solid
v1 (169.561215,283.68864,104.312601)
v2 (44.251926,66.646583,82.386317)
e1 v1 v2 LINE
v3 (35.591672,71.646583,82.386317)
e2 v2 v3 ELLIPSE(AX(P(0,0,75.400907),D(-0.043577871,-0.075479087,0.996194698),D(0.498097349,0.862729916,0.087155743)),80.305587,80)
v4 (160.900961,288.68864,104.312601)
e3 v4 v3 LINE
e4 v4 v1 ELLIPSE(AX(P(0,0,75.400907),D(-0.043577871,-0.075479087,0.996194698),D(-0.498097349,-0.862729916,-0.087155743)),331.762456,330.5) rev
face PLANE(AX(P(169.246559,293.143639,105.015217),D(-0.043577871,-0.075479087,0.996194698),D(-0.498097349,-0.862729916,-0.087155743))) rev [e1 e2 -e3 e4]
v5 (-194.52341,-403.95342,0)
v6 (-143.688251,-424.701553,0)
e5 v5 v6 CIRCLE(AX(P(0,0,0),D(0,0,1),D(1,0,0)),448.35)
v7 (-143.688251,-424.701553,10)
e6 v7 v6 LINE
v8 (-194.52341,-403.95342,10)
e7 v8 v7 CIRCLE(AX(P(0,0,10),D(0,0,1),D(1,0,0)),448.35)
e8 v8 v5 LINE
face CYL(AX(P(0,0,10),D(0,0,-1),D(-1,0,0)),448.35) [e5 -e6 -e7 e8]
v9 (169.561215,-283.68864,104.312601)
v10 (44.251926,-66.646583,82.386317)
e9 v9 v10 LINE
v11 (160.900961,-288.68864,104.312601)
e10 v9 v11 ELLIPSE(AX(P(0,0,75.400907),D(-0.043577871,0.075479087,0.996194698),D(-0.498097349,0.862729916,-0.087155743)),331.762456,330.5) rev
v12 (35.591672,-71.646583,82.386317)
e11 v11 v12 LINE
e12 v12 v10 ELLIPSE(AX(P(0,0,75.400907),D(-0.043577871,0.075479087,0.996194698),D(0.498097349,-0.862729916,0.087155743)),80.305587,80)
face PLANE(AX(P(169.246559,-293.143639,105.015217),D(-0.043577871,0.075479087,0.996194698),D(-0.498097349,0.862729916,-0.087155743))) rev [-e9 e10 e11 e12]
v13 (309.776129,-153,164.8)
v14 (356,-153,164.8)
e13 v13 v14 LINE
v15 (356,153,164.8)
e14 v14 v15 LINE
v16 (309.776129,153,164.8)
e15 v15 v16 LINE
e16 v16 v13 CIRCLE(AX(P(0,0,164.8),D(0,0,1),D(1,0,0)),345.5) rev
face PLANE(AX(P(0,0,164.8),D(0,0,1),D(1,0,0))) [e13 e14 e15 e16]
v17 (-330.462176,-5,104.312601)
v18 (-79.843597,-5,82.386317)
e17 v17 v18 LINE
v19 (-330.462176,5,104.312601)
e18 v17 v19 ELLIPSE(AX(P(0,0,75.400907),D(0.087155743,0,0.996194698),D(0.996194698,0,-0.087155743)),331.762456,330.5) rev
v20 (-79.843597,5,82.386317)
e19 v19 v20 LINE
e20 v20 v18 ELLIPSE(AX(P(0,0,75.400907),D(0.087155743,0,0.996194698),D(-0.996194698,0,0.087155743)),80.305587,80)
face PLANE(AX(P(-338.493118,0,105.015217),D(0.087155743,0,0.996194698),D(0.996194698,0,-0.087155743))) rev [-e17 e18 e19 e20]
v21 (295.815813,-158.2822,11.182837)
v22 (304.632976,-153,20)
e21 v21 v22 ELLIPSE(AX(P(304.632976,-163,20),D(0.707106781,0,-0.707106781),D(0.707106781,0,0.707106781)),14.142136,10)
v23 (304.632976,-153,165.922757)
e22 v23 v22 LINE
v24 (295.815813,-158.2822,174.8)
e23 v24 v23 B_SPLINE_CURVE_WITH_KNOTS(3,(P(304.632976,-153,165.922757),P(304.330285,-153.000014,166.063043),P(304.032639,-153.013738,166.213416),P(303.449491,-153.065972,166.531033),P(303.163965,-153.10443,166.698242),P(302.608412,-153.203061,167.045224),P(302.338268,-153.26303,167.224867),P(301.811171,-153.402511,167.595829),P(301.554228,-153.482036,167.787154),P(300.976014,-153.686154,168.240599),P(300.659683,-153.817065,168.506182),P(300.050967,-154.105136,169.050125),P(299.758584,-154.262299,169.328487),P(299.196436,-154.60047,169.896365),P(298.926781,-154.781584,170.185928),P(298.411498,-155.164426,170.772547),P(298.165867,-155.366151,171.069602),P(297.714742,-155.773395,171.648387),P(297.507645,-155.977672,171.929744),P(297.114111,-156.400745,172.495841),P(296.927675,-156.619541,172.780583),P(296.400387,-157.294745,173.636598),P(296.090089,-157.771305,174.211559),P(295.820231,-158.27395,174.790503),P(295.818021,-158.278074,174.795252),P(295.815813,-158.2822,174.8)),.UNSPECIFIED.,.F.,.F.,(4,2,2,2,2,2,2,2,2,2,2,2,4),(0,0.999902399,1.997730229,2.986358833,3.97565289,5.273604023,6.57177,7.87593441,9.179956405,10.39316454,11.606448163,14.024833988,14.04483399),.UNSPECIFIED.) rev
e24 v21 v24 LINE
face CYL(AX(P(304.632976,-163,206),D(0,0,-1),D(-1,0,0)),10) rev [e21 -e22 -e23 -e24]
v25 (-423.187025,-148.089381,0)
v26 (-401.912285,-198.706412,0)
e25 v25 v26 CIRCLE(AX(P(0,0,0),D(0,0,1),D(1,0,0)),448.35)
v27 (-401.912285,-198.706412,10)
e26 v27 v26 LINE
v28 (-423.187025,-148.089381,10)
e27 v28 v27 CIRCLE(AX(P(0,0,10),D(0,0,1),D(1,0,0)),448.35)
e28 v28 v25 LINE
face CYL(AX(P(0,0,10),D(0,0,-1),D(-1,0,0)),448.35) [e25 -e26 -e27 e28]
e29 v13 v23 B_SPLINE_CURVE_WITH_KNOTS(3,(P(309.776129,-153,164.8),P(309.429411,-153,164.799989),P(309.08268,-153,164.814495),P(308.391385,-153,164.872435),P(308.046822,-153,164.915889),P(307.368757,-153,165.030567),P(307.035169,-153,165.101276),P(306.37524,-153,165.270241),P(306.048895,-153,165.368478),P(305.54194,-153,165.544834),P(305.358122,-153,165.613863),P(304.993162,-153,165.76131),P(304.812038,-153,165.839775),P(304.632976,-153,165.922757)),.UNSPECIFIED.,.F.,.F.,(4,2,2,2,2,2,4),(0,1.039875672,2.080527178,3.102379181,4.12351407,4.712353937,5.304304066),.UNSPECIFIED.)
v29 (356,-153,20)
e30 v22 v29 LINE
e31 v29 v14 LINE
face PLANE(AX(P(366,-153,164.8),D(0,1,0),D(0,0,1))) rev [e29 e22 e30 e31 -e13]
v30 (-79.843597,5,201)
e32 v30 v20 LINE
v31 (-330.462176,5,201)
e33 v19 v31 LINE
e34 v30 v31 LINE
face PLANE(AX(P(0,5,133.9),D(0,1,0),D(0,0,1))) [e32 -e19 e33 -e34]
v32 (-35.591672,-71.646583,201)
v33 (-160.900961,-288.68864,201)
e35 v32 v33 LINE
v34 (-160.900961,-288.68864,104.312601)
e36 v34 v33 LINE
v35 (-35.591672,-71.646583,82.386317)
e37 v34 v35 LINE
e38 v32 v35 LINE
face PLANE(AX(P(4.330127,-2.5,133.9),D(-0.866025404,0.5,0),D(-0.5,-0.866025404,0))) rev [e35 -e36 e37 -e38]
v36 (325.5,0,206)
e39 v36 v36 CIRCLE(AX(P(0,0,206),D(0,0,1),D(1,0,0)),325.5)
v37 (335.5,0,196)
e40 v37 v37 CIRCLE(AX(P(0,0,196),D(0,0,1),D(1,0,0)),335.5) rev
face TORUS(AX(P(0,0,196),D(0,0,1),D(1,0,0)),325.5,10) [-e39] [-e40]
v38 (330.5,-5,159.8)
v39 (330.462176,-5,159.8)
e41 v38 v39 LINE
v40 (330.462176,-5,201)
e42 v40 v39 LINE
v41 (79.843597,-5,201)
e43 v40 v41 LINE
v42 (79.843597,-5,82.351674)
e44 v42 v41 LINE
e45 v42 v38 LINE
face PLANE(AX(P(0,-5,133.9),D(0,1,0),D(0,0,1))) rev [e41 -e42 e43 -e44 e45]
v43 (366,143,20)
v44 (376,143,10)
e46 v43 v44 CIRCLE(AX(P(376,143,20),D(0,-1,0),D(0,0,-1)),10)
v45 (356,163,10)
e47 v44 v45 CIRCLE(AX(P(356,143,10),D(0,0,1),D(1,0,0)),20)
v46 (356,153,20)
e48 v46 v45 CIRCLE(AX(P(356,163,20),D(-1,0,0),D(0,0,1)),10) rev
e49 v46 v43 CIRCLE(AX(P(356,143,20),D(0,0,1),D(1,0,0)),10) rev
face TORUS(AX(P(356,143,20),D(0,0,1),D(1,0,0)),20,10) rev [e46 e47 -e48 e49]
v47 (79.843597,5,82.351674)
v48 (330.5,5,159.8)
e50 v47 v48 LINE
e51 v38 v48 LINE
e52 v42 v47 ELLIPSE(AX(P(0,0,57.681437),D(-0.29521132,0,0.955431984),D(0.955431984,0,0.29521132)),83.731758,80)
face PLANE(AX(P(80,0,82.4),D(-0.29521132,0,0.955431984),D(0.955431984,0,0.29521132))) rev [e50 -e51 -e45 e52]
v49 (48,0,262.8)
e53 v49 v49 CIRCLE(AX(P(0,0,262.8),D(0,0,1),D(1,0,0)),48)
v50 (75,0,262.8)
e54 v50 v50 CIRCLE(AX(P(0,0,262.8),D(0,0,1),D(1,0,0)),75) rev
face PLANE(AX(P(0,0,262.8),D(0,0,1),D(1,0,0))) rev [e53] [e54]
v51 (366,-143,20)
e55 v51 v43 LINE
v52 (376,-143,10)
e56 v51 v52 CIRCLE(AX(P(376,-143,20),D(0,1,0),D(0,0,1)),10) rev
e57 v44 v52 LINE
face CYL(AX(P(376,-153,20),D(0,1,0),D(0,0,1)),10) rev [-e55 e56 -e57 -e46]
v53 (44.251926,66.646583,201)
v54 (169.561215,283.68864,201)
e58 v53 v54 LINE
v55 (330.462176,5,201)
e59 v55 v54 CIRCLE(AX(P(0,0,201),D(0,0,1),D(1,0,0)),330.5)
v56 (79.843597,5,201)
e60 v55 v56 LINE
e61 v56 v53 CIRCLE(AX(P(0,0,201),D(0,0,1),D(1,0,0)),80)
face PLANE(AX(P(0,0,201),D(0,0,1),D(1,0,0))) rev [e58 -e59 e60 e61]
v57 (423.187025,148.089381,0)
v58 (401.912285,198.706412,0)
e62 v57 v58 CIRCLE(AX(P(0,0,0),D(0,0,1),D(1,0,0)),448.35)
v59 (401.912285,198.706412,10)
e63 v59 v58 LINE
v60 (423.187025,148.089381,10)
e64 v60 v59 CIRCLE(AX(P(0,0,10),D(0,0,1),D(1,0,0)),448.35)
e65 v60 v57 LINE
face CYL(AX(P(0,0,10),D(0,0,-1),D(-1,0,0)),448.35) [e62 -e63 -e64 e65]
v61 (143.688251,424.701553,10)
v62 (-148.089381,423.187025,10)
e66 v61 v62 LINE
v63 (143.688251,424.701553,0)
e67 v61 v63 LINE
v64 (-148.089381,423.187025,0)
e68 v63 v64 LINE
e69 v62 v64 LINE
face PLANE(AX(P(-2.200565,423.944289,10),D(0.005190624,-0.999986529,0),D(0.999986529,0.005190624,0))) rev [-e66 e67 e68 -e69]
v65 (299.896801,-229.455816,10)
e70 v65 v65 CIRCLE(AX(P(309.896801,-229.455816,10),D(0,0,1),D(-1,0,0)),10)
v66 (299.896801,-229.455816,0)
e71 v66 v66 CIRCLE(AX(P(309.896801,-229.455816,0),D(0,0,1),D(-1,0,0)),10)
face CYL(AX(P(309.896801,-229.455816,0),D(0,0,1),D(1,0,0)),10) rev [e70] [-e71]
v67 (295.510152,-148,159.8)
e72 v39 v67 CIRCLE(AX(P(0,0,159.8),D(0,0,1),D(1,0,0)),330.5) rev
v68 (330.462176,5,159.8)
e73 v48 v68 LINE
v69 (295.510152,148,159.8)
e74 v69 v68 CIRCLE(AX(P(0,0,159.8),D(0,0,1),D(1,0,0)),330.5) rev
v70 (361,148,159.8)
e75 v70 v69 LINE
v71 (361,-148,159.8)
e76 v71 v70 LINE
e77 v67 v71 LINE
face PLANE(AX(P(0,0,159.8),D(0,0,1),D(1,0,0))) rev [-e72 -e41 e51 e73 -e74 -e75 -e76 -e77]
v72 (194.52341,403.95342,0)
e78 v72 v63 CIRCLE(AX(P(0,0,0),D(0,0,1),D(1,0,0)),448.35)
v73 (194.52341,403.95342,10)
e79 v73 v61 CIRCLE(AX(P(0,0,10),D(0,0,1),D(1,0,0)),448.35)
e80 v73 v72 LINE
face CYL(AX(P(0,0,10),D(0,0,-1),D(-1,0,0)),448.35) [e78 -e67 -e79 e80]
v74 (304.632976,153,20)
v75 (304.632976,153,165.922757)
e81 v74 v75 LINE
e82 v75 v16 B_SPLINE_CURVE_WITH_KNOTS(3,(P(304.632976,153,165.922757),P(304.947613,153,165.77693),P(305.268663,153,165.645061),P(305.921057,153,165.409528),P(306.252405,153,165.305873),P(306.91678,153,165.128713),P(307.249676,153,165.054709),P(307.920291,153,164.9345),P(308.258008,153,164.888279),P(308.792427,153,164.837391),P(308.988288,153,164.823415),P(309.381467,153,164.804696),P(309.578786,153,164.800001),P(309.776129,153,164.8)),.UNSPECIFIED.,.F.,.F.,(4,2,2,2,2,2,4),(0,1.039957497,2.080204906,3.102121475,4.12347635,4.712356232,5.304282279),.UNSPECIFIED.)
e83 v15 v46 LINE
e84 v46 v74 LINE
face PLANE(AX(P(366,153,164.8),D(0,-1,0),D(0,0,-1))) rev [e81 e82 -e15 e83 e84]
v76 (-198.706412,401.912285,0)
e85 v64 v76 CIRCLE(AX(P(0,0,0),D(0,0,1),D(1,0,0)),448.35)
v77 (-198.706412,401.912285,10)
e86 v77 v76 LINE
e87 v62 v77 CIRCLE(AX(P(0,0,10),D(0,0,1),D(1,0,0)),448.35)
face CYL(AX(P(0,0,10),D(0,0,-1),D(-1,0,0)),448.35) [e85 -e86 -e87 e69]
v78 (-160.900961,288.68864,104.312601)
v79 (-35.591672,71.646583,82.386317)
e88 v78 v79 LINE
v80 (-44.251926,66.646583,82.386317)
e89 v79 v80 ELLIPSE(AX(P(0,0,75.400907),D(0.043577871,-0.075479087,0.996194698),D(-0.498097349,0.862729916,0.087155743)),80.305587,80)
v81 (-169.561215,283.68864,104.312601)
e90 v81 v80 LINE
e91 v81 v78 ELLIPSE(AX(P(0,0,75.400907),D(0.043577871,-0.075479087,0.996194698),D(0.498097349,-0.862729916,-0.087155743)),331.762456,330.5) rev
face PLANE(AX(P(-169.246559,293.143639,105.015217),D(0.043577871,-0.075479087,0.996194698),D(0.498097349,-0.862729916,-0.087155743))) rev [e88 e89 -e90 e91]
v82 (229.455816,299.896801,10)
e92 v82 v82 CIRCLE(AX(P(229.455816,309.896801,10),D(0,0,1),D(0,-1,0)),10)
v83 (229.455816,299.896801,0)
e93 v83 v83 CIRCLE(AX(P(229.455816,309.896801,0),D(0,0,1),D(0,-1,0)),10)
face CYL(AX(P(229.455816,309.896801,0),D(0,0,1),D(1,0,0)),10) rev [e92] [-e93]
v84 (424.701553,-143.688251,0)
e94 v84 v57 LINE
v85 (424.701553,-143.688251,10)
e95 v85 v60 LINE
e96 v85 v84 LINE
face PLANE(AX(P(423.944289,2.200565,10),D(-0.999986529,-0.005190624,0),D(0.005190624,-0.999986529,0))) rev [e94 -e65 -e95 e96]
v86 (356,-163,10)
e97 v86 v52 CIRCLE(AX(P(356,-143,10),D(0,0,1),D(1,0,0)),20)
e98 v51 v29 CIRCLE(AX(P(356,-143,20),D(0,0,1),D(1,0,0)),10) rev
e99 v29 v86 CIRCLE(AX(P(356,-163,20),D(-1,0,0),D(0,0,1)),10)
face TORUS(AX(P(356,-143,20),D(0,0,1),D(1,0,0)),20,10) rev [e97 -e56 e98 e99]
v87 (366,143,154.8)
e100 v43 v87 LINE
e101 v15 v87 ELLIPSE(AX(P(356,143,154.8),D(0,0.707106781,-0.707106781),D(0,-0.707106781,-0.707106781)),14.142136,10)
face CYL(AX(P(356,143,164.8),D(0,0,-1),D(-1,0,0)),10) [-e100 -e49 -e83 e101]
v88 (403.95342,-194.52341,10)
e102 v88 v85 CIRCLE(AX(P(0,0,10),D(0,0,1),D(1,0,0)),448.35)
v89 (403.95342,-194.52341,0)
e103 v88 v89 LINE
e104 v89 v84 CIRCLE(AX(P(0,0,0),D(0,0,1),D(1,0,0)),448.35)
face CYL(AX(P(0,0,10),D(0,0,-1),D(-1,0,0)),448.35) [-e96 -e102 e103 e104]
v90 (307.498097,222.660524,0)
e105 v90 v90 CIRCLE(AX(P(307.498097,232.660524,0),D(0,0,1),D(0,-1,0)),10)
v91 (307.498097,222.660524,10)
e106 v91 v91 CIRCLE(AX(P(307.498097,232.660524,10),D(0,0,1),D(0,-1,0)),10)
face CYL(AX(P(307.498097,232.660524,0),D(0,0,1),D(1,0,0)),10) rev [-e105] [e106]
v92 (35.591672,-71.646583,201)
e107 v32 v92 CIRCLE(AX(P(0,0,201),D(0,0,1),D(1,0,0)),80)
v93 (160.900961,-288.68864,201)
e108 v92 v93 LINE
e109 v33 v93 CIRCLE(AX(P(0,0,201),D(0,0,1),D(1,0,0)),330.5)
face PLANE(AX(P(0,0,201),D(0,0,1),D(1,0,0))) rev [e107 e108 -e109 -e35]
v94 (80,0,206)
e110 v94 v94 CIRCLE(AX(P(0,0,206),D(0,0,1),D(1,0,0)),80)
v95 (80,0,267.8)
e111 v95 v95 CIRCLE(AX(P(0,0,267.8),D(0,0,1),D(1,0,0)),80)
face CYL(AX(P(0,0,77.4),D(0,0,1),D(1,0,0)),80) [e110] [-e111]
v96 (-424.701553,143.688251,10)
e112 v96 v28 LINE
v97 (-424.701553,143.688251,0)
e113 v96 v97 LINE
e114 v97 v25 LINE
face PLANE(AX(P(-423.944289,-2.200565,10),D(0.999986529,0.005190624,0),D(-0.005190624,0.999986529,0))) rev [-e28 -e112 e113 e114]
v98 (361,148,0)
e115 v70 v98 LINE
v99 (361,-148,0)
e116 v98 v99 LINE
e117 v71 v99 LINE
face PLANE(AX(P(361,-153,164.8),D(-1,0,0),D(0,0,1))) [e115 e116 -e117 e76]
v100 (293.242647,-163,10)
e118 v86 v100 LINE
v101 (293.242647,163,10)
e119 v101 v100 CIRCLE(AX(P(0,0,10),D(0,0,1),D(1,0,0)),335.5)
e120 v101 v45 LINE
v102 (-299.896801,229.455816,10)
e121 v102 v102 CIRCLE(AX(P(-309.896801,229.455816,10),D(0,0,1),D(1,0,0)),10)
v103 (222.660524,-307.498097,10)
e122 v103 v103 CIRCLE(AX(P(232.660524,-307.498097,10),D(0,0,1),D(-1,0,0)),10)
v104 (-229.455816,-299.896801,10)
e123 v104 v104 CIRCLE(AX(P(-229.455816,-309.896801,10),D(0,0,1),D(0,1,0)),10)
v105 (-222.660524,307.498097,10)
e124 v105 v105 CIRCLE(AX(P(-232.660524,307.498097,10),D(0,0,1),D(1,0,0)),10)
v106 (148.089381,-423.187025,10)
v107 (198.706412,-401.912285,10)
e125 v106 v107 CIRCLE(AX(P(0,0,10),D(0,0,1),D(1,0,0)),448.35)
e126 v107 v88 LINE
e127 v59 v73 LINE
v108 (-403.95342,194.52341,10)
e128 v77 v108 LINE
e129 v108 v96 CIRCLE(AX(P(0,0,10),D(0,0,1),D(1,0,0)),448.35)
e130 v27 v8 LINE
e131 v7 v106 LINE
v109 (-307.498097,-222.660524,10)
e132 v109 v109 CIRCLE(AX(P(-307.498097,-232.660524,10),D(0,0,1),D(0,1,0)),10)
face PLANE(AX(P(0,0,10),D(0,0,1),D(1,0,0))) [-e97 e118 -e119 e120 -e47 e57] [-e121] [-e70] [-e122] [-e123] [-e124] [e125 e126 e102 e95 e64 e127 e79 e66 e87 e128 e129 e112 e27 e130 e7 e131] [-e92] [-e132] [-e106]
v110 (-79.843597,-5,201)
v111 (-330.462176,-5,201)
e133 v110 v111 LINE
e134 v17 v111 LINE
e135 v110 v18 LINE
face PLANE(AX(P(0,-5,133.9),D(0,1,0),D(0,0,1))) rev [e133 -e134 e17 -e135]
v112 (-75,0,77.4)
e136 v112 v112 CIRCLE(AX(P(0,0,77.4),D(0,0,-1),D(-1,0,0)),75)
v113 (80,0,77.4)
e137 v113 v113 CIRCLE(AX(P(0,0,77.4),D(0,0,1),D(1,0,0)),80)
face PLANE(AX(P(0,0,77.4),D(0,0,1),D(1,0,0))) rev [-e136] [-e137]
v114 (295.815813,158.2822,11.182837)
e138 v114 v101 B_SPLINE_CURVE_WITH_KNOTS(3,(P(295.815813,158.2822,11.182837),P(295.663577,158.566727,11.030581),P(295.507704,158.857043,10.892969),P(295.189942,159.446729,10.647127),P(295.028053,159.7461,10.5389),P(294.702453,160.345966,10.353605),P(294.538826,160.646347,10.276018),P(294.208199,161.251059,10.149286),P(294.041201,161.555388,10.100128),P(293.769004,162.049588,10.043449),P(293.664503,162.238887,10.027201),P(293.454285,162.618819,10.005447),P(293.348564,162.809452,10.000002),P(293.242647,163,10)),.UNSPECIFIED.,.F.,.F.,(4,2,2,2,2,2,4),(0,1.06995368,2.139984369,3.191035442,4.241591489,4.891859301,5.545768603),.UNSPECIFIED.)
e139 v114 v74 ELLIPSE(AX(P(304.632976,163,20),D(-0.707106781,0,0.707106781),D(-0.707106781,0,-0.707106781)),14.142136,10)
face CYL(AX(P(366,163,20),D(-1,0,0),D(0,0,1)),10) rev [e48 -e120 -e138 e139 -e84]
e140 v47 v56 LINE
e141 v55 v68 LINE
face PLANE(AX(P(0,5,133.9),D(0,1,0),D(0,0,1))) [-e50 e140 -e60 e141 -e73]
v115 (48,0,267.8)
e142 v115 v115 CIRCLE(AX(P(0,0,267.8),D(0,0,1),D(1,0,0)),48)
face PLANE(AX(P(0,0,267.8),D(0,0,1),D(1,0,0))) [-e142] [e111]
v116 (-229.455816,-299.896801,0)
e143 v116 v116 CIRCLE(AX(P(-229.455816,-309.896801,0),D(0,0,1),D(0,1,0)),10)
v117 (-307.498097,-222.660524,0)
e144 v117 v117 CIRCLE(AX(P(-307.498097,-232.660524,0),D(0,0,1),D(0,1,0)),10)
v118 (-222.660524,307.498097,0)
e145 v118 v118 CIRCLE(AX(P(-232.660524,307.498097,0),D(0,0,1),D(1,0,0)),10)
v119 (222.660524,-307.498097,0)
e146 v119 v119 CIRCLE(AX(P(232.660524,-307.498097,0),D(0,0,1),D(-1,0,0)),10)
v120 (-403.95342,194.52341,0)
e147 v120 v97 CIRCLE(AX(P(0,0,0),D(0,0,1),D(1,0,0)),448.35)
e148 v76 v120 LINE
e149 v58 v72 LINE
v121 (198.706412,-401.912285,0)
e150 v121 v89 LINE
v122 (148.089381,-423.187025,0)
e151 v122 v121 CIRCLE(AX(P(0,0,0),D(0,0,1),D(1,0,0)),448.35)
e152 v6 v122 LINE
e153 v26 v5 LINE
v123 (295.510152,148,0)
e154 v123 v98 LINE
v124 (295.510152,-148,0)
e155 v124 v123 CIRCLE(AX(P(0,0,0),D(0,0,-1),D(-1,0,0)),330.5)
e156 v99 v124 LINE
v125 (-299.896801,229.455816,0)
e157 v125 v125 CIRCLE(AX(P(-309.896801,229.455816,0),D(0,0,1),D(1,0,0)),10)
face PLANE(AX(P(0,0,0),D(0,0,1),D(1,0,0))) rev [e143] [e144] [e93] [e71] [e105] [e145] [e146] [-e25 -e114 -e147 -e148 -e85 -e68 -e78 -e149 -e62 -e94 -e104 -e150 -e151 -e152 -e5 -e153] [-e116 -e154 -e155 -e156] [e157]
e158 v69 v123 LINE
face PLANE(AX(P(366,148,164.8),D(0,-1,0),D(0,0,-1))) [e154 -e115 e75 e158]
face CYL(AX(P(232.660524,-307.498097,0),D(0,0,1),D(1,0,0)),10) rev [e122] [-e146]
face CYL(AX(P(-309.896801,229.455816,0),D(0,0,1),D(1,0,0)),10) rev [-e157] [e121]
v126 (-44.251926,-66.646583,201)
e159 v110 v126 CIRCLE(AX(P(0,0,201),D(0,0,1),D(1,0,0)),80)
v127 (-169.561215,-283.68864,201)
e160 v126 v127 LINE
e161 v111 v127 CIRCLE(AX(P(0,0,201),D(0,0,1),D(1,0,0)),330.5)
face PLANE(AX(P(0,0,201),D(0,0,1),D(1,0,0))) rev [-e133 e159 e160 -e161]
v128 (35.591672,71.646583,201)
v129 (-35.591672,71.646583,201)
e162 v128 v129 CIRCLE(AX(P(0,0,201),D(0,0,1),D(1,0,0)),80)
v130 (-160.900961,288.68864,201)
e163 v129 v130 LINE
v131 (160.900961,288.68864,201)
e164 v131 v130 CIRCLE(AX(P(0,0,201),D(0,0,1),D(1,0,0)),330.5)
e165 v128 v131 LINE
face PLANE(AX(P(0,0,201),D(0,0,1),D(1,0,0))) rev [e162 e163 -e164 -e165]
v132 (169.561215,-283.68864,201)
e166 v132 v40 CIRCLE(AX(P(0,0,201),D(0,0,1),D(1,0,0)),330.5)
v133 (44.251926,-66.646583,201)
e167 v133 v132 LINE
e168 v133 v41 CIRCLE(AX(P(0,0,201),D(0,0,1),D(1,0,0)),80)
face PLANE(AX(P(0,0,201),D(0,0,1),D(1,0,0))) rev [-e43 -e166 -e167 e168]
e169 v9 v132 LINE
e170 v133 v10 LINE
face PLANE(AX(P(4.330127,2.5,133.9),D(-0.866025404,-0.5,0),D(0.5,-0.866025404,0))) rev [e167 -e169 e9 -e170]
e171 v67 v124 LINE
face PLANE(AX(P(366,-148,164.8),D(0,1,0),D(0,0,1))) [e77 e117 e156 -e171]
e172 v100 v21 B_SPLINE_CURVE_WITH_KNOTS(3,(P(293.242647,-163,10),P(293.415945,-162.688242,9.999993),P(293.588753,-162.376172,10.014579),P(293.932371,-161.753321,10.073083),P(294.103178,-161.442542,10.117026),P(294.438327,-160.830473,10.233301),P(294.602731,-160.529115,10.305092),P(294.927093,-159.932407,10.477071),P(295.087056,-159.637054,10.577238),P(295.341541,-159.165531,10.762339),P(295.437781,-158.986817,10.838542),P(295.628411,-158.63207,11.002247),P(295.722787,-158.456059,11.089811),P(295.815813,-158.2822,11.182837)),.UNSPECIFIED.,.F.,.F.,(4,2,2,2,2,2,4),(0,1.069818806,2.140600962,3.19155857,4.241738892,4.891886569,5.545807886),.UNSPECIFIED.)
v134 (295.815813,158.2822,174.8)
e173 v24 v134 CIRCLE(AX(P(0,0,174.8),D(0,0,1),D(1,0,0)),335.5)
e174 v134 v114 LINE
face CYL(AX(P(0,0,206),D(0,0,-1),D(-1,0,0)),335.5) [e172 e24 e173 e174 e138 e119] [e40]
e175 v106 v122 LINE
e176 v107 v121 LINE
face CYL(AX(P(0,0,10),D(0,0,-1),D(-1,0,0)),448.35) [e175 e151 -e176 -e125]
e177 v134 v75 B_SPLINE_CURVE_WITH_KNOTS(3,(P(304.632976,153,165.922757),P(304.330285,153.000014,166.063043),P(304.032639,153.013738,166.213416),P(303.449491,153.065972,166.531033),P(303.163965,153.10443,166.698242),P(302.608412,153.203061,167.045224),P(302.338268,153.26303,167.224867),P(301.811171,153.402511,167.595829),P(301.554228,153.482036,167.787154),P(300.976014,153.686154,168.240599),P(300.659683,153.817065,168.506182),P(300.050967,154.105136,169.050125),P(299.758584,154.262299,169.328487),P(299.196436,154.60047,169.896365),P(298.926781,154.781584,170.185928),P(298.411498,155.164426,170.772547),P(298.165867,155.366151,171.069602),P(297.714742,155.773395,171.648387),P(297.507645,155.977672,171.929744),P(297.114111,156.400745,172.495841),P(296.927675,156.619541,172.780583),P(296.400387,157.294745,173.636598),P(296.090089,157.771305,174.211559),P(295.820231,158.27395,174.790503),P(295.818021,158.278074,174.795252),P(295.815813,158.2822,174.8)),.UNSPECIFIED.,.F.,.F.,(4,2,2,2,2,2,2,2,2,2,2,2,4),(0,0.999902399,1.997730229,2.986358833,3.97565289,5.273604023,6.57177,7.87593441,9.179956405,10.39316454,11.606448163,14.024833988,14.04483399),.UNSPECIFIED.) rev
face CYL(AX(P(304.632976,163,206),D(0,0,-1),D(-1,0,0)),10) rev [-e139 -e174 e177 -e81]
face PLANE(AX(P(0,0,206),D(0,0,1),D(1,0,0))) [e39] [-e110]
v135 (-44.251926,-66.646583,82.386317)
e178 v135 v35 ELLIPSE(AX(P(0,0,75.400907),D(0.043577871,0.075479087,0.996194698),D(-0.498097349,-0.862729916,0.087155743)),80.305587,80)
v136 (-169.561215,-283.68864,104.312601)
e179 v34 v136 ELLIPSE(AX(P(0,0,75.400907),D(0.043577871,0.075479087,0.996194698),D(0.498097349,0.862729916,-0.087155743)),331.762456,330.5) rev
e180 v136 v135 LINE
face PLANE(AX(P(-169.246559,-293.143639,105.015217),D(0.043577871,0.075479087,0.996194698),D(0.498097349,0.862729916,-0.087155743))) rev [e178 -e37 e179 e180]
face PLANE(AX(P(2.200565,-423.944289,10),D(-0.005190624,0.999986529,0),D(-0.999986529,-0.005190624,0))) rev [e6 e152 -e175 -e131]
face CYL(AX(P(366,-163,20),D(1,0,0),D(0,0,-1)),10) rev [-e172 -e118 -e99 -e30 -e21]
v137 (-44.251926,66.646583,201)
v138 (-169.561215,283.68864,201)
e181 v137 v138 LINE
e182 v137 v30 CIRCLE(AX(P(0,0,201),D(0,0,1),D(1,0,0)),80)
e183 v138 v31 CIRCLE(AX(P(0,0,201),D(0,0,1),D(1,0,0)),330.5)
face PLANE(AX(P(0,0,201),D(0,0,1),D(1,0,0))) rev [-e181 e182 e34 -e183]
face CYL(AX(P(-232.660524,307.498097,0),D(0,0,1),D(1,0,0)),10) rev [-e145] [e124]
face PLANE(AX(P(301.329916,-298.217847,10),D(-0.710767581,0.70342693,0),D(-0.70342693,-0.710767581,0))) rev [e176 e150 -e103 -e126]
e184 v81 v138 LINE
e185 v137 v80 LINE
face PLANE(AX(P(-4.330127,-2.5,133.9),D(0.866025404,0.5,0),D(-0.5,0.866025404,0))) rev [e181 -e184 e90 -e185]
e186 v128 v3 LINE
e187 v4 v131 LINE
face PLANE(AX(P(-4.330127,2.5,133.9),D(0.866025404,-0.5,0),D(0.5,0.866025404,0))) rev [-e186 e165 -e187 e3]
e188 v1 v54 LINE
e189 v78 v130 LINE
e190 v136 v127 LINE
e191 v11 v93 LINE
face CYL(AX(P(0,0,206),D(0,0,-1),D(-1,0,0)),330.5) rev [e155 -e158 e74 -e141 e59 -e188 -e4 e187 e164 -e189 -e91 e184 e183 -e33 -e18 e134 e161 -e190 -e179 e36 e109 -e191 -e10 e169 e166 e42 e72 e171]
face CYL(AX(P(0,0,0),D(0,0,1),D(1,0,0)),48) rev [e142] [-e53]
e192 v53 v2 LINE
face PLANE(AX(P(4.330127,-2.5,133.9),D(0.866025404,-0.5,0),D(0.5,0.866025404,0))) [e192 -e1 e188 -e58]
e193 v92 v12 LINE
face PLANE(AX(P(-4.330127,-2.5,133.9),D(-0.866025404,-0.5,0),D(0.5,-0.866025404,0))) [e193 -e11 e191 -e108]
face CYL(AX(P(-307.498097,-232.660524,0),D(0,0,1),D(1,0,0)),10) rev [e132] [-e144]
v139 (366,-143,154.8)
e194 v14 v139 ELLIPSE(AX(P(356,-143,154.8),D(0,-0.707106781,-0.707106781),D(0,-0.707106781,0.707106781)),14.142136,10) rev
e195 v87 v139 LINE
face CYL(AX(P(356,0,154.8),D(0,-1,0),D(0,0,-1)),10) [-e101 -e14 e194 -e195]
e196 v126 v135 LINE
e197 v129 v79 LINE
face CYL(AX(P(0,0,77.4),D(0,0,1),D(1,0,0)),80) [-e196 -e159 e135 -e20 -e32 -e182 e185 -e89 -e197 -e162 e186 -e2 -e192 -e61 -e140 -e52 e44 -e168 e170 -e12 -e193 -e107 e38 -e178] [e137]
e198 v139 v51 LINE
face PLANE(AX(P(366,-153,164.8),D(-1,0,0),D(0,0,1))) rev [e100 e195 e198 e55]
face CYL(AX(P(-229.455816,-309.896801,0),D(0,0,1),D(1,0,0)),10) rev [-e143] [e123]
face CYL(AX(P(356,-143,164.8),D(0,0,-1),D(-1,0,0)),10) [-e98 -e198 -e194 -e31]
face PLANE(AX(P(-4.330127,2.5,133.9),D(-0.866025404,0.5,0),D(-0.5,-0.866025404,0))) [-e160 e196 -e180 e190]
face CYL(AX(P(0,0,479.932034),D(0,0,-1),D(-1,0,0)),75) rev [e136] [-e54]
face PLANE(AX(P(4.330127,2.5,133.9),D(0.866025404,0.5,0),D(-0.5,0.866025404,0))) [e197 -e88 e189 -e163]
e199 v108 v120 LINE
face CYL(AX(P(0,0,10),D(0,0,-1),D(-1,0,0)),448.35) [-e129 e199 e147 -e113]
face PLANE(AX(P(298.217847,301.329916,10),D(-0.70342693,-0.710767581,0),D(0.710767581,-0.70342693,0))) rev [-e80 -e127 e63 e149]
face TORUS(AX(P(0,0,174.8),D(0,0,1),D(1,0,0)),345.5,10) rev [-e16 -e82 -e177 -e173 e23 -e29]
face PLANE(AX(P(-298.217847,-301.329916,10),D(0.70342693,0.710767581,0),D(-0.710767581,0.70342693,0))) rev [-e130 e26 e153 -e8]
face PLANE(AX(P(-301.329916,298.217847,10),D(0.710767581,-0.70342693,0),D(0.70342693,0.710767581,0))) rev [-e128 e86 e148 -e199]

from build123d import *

# Parameters (mm, degrees)
EXTRUDE_1_DEPTH          = 10
SKETCH_2_R               = 335.5
EXTRUDE_2_DEPTH          = 196
EXTRUDE_3_DEPTH          = 154.8
SHELL_START              = 10
SHELL_1_OUTLINE_R        = 330.5
SHELL_1_DEPTH            = 191
SHELL_1_2_DEPTH          = 149.8
CUT_EXTRUDE_4_DEPTH      = 632.790169442
EXTRUDE_4_DEPTH          = 61.8
EXTRUDE_4_DEPTH_BACK     = 128.6
SKETCH_6_R               = 80
SKETCH_9_R               = 75
CUT_EXTRUDE_5_DEPTH      = 185.4
SKETCH_10_R              = 10
CUT_EXTRUDE_6_DEPTH      = 654.608184009
PATTERN_CIRCULAR_1_COUNT = 4
RIB_START                = -5
RIB_1_DEPTH              = 10
PATTERN_CIRCULAR_3_COUNT = 6
RIB_2_REACH              = 659.617
SKETCH_12_WALL_W         = 1579.41836799
SKETCH_12_WALL_H         = 10
SKETCH_13_R              = 48
CUT_EXTRUDE_7_DEPTH      = 658.616649883
FILLET_1_R               = 10


# Read off the part's stored shape, not the designer's step: 抽壳1, 筋1
with BuildPart() as part:
    # 草图1 → 凸台-拉伸1 (new body)
    with BuildSketch(Plane.XY):
        with BuildLine():
            ThreePointArc((403.953420148, -194.523409518), (415.106395354, -169.423738113), (424.701552978, -143.688250731))
            Line((424.701552978, -143.688250731), (423.18702464, 148.0893807))
            ThreePointArc((423.18702464, 148.0893807), (413.325221182, 173.723872955), (401.91228456, 198.706411622))
            Line((401.91228456, 198.706411622), (194.523409518, 403.953420148))
            ThreePointArc((194.523409518, 403.953420148), (169.423738113, 415.106395354), (143.688250731, 424.701552978))
            Line((143.688250731, 424.701552978), (-148.0893807, 423.18702464))
            ThreePointArc((-148.0893807, 423.18702464), (-173.723872955, 413.325221182), (-198.706411622, 401.91228456))
            Line((-198.706411622, 401.91228456), (-403.953420148, 194.523409518))
            ThreePointArc((-403.953420148, 194.523409518), (-415.106395354, 169.423738113), (-424.701552978, 143.688250731))
            Line((-424.701552978, 143.688250731), (-423.18702464, -148.0893807))
            ThreePointArc((-423.18702464, -148.0893807), (-413.325221182, -173.723872955), (-401.91228456, -198.706411622))
            Line((-401.91228456, -198.706411622), (-194.523409518, -403.953420148))
            ThreePointArc((-194.523409518, -403.953420148), (-169.423738113, -415.106395354), (-143.688250731, -424.701552978))
            Line((-143.688250731, -424.701552978), (148.0893807, -423.18702464))
            ThreePointArc((148.0893807, -423.18702464), (173.723872955, -413.325221182), (198.706411622, -401.91228456))
            Line((198.706411622, -401.91228456), (403.953420148, -194.523409518))
        make_face()
    extrude(amount=EXTRUDE_1_DEPTH)

    # 草图4 → 切除-拉伸4 (cut, through all)
    with BuildSketch(Plane(origin=(0, 0, 10), x_dir=(-1, 0, 0), z_dir=(0, 0, -1))):
        with BuildLine():
            Line((-295.51015211, -148), (-361, -148))
            Line((-361, -148), (-361, 148))
            Line((-361, 148), (-295.51015211, 148))
            ThreePointArc((-295.51015211, 148), (330.5, 0), (-295.51015211, -148))
        make_face()
    extrude(amount=CUT_EXTRUDE_4_DEPTH, mode=Mode.SUBTRACT)


with BuildPart() as body_2:
    # 草图2 → 凸台-拉伸2 (new body)
    with BuildSketch(Plane.XY.offset(10)):
        Circle(SKETCH_2_R)
    extrude(amount=EXTRUDE_2_DEPTH)


with BuildPart() as body_3:
    # 草图3 → 凸台-拉伸3 (new body)
    with BuildSketch(Plane.XY.offset(10)):
        with BuildLine():
            Line((366, -153), (366, 153))
            Line((366, 153), (298.582065771, 153))
            ThreePointArc((298.582065771, 153), (335.5, 0), (298.582065771, -153))
            Line((298.582065771, -153), (366, -153))
        make_face()
    extrude(amount=EXTRUDE_3_DEPTH)


with BuildPart() as body_2_1:
    add(body_2.part)

    # Combine 1: union body 3
    add(body_3.part)

    # 抽壳1 outline → 抽壳1 (cut)
    with BuildSketch(Plane.XY.offset(SHELL_START)):
        Circle(SHELL_1_OUTLINE_R)
    extrude(amount=SHELL_1_DEPTH, mode=Mode.SUBTRACT)

    # Shell 1 2 outline → Shell 1 2 (cut)
    with BuildSketch(Plane.XY.offset(SHELL_START)):
        with BuildLine():
            ThreePointArc((295.51015211, 148), (330.5, 0), (295.51015211, -148))
            Line((295.51015211, -148), (361, -148))
            Line((361, -148), (361, 148))
            Line((361, 148), (295.51015211, 148))
        make_face()
    extrude(amount=SHELL_1_2_DEPTH, mode=Mode.SUBTRACT)

    # Combine 2: union part
    add(part.part)

    # 草图6 → 凸台-拉伸4 (add, two sides: drawn at the far end of the back side and taken through both)
    with BuildSketch(Plane.XY.offset(206).offset(-EXTRUDE_4_DEPTH_BACK)):
        Circle(SKETCH_6_R)
    extrude(amount=EXTRUDE_4_DEPTH + EXTRUDE_4_DEPTH_BACK)

    # 草图9 → 切除-拉伸5 (cut)
    with BuildSketch(Plane(origin=(0, 0, 77.4), x_dir=(-1, 0, 0), z_dir=(0, 0, -1))):
        Circle(SKETCH_9_R)
    extrude(amount=-CUT_EXTRUDE_5_DEPTH, mode=Mode.SUBTRACT)

    # 草图10 → 切除-拉伸6 (cut, through all)
    with BuildSketch(Plane.XY.offset(10)):
        with Locations((-232.660524103, 307.498096619)):
            Circle(SKETCH_10_R)
        with Locations((-309.896801034, 229.455816246)):
            Circle(SKETCH_10_R)
    cut_extrude_6 = extrude(amount=-CUT_EXTRUDE_6_DEPTH, mode=Mode.SUBTRACT)

    # 阵列(圆周)1: 切除-拉伸6 ×4 about axis
    pattern_circular_1_axis = Axis((0, 0, 0), (0, 0, 1))
    for i in range(1, PATTERN_CIRCULAR_1_COUNT):
        add(cut_extrude_6.rotate(pattern_circular_1_axis, i * 360 / PATTERN_CIRCULAR_1_COUNT), mode=Mode.SUBTRACT)

    # 筋1 outline → 筋1 (add)
    with BuildSketch(Plane(origin=(0, 0, 0), x_dir=(1, 0, 0), z_dir=(0, 1, 0)).offset(RIB_START)):
        Polygon((-79.843597113, -82.38631652), (-330.5, -104.315910213), (-332, -104.447143208), (-332, -201), (-78, -201), (-78, -82.225022673), align=None)
    rib_1 = extrude(amount=RIB_1_DEPTH)

    # 阵列(圆周)3: 筋1 ×6 about axis, 1 skipped
    pattern_circular_3_axis = Axis((0, 0, 0), (0, 0, 1))
    add([rib_1.rotate(pattern_circular_3_axis, i * 360 / PATTERN_CIRCULAR_3_COUNT) for i in range(1, PATTERN_CIRCULAR_3_COUNT) if i not in (3,)])

    # 草图12 wall → 筋2 (add, up to next)
    with BuildSketch(Plane(origin=(205.25, 0, 121.1), x_dir=(0.955431984347, 0, 0.295211319714), z_dir=(0.295211319714, 0, -0.955431984347)), mode=Mode.PRIVATE) as rib_2_sk1:
        Rectangle(SKETCH_12_WALL_W, SKETCH_12_WALL_H)
    rib_2_tool1 = extrude(rib_2_sk1.sketch, amount=-RIB_2_REACH, mode=Mode.PRIVATE) - body_2_1.part
    add(rib_2_tool1.solids().sort_by_distance((205.25, 0, 121.1))[0])

    # 草图13 → 切除-拉伸7 (cut, through all)
    with BuildSketch(Plane.XY.offset(267.8)):
        Circle(SKETCH_13_R)
    extrude(amount=-CUT_EXTRUDE_7_DEPTH, mode=Mode.SUBTRACT)

    # 圆角1
    fillet_1_edges = [body_2_1.edges().sort_by_distance(p)[0] for p in [
        (-335.5, 0, 206),
        (332.291032885, 153, 10),
        (366, 153, 87.4),
        (298.582065771, 153, 87.4),
        (332.291032885, -153, 10),
        (298.582065771, -153, 87.4),
        (366, 0, 10),
        (366, -153, 87.4),
        (326.139949306, 78.695511098, 164.8),
        (366, 0, 164.8),
    ]]
    fillet(fillet_1_edges, radius=FILLET_1_R)


solid = body_2_1.part
